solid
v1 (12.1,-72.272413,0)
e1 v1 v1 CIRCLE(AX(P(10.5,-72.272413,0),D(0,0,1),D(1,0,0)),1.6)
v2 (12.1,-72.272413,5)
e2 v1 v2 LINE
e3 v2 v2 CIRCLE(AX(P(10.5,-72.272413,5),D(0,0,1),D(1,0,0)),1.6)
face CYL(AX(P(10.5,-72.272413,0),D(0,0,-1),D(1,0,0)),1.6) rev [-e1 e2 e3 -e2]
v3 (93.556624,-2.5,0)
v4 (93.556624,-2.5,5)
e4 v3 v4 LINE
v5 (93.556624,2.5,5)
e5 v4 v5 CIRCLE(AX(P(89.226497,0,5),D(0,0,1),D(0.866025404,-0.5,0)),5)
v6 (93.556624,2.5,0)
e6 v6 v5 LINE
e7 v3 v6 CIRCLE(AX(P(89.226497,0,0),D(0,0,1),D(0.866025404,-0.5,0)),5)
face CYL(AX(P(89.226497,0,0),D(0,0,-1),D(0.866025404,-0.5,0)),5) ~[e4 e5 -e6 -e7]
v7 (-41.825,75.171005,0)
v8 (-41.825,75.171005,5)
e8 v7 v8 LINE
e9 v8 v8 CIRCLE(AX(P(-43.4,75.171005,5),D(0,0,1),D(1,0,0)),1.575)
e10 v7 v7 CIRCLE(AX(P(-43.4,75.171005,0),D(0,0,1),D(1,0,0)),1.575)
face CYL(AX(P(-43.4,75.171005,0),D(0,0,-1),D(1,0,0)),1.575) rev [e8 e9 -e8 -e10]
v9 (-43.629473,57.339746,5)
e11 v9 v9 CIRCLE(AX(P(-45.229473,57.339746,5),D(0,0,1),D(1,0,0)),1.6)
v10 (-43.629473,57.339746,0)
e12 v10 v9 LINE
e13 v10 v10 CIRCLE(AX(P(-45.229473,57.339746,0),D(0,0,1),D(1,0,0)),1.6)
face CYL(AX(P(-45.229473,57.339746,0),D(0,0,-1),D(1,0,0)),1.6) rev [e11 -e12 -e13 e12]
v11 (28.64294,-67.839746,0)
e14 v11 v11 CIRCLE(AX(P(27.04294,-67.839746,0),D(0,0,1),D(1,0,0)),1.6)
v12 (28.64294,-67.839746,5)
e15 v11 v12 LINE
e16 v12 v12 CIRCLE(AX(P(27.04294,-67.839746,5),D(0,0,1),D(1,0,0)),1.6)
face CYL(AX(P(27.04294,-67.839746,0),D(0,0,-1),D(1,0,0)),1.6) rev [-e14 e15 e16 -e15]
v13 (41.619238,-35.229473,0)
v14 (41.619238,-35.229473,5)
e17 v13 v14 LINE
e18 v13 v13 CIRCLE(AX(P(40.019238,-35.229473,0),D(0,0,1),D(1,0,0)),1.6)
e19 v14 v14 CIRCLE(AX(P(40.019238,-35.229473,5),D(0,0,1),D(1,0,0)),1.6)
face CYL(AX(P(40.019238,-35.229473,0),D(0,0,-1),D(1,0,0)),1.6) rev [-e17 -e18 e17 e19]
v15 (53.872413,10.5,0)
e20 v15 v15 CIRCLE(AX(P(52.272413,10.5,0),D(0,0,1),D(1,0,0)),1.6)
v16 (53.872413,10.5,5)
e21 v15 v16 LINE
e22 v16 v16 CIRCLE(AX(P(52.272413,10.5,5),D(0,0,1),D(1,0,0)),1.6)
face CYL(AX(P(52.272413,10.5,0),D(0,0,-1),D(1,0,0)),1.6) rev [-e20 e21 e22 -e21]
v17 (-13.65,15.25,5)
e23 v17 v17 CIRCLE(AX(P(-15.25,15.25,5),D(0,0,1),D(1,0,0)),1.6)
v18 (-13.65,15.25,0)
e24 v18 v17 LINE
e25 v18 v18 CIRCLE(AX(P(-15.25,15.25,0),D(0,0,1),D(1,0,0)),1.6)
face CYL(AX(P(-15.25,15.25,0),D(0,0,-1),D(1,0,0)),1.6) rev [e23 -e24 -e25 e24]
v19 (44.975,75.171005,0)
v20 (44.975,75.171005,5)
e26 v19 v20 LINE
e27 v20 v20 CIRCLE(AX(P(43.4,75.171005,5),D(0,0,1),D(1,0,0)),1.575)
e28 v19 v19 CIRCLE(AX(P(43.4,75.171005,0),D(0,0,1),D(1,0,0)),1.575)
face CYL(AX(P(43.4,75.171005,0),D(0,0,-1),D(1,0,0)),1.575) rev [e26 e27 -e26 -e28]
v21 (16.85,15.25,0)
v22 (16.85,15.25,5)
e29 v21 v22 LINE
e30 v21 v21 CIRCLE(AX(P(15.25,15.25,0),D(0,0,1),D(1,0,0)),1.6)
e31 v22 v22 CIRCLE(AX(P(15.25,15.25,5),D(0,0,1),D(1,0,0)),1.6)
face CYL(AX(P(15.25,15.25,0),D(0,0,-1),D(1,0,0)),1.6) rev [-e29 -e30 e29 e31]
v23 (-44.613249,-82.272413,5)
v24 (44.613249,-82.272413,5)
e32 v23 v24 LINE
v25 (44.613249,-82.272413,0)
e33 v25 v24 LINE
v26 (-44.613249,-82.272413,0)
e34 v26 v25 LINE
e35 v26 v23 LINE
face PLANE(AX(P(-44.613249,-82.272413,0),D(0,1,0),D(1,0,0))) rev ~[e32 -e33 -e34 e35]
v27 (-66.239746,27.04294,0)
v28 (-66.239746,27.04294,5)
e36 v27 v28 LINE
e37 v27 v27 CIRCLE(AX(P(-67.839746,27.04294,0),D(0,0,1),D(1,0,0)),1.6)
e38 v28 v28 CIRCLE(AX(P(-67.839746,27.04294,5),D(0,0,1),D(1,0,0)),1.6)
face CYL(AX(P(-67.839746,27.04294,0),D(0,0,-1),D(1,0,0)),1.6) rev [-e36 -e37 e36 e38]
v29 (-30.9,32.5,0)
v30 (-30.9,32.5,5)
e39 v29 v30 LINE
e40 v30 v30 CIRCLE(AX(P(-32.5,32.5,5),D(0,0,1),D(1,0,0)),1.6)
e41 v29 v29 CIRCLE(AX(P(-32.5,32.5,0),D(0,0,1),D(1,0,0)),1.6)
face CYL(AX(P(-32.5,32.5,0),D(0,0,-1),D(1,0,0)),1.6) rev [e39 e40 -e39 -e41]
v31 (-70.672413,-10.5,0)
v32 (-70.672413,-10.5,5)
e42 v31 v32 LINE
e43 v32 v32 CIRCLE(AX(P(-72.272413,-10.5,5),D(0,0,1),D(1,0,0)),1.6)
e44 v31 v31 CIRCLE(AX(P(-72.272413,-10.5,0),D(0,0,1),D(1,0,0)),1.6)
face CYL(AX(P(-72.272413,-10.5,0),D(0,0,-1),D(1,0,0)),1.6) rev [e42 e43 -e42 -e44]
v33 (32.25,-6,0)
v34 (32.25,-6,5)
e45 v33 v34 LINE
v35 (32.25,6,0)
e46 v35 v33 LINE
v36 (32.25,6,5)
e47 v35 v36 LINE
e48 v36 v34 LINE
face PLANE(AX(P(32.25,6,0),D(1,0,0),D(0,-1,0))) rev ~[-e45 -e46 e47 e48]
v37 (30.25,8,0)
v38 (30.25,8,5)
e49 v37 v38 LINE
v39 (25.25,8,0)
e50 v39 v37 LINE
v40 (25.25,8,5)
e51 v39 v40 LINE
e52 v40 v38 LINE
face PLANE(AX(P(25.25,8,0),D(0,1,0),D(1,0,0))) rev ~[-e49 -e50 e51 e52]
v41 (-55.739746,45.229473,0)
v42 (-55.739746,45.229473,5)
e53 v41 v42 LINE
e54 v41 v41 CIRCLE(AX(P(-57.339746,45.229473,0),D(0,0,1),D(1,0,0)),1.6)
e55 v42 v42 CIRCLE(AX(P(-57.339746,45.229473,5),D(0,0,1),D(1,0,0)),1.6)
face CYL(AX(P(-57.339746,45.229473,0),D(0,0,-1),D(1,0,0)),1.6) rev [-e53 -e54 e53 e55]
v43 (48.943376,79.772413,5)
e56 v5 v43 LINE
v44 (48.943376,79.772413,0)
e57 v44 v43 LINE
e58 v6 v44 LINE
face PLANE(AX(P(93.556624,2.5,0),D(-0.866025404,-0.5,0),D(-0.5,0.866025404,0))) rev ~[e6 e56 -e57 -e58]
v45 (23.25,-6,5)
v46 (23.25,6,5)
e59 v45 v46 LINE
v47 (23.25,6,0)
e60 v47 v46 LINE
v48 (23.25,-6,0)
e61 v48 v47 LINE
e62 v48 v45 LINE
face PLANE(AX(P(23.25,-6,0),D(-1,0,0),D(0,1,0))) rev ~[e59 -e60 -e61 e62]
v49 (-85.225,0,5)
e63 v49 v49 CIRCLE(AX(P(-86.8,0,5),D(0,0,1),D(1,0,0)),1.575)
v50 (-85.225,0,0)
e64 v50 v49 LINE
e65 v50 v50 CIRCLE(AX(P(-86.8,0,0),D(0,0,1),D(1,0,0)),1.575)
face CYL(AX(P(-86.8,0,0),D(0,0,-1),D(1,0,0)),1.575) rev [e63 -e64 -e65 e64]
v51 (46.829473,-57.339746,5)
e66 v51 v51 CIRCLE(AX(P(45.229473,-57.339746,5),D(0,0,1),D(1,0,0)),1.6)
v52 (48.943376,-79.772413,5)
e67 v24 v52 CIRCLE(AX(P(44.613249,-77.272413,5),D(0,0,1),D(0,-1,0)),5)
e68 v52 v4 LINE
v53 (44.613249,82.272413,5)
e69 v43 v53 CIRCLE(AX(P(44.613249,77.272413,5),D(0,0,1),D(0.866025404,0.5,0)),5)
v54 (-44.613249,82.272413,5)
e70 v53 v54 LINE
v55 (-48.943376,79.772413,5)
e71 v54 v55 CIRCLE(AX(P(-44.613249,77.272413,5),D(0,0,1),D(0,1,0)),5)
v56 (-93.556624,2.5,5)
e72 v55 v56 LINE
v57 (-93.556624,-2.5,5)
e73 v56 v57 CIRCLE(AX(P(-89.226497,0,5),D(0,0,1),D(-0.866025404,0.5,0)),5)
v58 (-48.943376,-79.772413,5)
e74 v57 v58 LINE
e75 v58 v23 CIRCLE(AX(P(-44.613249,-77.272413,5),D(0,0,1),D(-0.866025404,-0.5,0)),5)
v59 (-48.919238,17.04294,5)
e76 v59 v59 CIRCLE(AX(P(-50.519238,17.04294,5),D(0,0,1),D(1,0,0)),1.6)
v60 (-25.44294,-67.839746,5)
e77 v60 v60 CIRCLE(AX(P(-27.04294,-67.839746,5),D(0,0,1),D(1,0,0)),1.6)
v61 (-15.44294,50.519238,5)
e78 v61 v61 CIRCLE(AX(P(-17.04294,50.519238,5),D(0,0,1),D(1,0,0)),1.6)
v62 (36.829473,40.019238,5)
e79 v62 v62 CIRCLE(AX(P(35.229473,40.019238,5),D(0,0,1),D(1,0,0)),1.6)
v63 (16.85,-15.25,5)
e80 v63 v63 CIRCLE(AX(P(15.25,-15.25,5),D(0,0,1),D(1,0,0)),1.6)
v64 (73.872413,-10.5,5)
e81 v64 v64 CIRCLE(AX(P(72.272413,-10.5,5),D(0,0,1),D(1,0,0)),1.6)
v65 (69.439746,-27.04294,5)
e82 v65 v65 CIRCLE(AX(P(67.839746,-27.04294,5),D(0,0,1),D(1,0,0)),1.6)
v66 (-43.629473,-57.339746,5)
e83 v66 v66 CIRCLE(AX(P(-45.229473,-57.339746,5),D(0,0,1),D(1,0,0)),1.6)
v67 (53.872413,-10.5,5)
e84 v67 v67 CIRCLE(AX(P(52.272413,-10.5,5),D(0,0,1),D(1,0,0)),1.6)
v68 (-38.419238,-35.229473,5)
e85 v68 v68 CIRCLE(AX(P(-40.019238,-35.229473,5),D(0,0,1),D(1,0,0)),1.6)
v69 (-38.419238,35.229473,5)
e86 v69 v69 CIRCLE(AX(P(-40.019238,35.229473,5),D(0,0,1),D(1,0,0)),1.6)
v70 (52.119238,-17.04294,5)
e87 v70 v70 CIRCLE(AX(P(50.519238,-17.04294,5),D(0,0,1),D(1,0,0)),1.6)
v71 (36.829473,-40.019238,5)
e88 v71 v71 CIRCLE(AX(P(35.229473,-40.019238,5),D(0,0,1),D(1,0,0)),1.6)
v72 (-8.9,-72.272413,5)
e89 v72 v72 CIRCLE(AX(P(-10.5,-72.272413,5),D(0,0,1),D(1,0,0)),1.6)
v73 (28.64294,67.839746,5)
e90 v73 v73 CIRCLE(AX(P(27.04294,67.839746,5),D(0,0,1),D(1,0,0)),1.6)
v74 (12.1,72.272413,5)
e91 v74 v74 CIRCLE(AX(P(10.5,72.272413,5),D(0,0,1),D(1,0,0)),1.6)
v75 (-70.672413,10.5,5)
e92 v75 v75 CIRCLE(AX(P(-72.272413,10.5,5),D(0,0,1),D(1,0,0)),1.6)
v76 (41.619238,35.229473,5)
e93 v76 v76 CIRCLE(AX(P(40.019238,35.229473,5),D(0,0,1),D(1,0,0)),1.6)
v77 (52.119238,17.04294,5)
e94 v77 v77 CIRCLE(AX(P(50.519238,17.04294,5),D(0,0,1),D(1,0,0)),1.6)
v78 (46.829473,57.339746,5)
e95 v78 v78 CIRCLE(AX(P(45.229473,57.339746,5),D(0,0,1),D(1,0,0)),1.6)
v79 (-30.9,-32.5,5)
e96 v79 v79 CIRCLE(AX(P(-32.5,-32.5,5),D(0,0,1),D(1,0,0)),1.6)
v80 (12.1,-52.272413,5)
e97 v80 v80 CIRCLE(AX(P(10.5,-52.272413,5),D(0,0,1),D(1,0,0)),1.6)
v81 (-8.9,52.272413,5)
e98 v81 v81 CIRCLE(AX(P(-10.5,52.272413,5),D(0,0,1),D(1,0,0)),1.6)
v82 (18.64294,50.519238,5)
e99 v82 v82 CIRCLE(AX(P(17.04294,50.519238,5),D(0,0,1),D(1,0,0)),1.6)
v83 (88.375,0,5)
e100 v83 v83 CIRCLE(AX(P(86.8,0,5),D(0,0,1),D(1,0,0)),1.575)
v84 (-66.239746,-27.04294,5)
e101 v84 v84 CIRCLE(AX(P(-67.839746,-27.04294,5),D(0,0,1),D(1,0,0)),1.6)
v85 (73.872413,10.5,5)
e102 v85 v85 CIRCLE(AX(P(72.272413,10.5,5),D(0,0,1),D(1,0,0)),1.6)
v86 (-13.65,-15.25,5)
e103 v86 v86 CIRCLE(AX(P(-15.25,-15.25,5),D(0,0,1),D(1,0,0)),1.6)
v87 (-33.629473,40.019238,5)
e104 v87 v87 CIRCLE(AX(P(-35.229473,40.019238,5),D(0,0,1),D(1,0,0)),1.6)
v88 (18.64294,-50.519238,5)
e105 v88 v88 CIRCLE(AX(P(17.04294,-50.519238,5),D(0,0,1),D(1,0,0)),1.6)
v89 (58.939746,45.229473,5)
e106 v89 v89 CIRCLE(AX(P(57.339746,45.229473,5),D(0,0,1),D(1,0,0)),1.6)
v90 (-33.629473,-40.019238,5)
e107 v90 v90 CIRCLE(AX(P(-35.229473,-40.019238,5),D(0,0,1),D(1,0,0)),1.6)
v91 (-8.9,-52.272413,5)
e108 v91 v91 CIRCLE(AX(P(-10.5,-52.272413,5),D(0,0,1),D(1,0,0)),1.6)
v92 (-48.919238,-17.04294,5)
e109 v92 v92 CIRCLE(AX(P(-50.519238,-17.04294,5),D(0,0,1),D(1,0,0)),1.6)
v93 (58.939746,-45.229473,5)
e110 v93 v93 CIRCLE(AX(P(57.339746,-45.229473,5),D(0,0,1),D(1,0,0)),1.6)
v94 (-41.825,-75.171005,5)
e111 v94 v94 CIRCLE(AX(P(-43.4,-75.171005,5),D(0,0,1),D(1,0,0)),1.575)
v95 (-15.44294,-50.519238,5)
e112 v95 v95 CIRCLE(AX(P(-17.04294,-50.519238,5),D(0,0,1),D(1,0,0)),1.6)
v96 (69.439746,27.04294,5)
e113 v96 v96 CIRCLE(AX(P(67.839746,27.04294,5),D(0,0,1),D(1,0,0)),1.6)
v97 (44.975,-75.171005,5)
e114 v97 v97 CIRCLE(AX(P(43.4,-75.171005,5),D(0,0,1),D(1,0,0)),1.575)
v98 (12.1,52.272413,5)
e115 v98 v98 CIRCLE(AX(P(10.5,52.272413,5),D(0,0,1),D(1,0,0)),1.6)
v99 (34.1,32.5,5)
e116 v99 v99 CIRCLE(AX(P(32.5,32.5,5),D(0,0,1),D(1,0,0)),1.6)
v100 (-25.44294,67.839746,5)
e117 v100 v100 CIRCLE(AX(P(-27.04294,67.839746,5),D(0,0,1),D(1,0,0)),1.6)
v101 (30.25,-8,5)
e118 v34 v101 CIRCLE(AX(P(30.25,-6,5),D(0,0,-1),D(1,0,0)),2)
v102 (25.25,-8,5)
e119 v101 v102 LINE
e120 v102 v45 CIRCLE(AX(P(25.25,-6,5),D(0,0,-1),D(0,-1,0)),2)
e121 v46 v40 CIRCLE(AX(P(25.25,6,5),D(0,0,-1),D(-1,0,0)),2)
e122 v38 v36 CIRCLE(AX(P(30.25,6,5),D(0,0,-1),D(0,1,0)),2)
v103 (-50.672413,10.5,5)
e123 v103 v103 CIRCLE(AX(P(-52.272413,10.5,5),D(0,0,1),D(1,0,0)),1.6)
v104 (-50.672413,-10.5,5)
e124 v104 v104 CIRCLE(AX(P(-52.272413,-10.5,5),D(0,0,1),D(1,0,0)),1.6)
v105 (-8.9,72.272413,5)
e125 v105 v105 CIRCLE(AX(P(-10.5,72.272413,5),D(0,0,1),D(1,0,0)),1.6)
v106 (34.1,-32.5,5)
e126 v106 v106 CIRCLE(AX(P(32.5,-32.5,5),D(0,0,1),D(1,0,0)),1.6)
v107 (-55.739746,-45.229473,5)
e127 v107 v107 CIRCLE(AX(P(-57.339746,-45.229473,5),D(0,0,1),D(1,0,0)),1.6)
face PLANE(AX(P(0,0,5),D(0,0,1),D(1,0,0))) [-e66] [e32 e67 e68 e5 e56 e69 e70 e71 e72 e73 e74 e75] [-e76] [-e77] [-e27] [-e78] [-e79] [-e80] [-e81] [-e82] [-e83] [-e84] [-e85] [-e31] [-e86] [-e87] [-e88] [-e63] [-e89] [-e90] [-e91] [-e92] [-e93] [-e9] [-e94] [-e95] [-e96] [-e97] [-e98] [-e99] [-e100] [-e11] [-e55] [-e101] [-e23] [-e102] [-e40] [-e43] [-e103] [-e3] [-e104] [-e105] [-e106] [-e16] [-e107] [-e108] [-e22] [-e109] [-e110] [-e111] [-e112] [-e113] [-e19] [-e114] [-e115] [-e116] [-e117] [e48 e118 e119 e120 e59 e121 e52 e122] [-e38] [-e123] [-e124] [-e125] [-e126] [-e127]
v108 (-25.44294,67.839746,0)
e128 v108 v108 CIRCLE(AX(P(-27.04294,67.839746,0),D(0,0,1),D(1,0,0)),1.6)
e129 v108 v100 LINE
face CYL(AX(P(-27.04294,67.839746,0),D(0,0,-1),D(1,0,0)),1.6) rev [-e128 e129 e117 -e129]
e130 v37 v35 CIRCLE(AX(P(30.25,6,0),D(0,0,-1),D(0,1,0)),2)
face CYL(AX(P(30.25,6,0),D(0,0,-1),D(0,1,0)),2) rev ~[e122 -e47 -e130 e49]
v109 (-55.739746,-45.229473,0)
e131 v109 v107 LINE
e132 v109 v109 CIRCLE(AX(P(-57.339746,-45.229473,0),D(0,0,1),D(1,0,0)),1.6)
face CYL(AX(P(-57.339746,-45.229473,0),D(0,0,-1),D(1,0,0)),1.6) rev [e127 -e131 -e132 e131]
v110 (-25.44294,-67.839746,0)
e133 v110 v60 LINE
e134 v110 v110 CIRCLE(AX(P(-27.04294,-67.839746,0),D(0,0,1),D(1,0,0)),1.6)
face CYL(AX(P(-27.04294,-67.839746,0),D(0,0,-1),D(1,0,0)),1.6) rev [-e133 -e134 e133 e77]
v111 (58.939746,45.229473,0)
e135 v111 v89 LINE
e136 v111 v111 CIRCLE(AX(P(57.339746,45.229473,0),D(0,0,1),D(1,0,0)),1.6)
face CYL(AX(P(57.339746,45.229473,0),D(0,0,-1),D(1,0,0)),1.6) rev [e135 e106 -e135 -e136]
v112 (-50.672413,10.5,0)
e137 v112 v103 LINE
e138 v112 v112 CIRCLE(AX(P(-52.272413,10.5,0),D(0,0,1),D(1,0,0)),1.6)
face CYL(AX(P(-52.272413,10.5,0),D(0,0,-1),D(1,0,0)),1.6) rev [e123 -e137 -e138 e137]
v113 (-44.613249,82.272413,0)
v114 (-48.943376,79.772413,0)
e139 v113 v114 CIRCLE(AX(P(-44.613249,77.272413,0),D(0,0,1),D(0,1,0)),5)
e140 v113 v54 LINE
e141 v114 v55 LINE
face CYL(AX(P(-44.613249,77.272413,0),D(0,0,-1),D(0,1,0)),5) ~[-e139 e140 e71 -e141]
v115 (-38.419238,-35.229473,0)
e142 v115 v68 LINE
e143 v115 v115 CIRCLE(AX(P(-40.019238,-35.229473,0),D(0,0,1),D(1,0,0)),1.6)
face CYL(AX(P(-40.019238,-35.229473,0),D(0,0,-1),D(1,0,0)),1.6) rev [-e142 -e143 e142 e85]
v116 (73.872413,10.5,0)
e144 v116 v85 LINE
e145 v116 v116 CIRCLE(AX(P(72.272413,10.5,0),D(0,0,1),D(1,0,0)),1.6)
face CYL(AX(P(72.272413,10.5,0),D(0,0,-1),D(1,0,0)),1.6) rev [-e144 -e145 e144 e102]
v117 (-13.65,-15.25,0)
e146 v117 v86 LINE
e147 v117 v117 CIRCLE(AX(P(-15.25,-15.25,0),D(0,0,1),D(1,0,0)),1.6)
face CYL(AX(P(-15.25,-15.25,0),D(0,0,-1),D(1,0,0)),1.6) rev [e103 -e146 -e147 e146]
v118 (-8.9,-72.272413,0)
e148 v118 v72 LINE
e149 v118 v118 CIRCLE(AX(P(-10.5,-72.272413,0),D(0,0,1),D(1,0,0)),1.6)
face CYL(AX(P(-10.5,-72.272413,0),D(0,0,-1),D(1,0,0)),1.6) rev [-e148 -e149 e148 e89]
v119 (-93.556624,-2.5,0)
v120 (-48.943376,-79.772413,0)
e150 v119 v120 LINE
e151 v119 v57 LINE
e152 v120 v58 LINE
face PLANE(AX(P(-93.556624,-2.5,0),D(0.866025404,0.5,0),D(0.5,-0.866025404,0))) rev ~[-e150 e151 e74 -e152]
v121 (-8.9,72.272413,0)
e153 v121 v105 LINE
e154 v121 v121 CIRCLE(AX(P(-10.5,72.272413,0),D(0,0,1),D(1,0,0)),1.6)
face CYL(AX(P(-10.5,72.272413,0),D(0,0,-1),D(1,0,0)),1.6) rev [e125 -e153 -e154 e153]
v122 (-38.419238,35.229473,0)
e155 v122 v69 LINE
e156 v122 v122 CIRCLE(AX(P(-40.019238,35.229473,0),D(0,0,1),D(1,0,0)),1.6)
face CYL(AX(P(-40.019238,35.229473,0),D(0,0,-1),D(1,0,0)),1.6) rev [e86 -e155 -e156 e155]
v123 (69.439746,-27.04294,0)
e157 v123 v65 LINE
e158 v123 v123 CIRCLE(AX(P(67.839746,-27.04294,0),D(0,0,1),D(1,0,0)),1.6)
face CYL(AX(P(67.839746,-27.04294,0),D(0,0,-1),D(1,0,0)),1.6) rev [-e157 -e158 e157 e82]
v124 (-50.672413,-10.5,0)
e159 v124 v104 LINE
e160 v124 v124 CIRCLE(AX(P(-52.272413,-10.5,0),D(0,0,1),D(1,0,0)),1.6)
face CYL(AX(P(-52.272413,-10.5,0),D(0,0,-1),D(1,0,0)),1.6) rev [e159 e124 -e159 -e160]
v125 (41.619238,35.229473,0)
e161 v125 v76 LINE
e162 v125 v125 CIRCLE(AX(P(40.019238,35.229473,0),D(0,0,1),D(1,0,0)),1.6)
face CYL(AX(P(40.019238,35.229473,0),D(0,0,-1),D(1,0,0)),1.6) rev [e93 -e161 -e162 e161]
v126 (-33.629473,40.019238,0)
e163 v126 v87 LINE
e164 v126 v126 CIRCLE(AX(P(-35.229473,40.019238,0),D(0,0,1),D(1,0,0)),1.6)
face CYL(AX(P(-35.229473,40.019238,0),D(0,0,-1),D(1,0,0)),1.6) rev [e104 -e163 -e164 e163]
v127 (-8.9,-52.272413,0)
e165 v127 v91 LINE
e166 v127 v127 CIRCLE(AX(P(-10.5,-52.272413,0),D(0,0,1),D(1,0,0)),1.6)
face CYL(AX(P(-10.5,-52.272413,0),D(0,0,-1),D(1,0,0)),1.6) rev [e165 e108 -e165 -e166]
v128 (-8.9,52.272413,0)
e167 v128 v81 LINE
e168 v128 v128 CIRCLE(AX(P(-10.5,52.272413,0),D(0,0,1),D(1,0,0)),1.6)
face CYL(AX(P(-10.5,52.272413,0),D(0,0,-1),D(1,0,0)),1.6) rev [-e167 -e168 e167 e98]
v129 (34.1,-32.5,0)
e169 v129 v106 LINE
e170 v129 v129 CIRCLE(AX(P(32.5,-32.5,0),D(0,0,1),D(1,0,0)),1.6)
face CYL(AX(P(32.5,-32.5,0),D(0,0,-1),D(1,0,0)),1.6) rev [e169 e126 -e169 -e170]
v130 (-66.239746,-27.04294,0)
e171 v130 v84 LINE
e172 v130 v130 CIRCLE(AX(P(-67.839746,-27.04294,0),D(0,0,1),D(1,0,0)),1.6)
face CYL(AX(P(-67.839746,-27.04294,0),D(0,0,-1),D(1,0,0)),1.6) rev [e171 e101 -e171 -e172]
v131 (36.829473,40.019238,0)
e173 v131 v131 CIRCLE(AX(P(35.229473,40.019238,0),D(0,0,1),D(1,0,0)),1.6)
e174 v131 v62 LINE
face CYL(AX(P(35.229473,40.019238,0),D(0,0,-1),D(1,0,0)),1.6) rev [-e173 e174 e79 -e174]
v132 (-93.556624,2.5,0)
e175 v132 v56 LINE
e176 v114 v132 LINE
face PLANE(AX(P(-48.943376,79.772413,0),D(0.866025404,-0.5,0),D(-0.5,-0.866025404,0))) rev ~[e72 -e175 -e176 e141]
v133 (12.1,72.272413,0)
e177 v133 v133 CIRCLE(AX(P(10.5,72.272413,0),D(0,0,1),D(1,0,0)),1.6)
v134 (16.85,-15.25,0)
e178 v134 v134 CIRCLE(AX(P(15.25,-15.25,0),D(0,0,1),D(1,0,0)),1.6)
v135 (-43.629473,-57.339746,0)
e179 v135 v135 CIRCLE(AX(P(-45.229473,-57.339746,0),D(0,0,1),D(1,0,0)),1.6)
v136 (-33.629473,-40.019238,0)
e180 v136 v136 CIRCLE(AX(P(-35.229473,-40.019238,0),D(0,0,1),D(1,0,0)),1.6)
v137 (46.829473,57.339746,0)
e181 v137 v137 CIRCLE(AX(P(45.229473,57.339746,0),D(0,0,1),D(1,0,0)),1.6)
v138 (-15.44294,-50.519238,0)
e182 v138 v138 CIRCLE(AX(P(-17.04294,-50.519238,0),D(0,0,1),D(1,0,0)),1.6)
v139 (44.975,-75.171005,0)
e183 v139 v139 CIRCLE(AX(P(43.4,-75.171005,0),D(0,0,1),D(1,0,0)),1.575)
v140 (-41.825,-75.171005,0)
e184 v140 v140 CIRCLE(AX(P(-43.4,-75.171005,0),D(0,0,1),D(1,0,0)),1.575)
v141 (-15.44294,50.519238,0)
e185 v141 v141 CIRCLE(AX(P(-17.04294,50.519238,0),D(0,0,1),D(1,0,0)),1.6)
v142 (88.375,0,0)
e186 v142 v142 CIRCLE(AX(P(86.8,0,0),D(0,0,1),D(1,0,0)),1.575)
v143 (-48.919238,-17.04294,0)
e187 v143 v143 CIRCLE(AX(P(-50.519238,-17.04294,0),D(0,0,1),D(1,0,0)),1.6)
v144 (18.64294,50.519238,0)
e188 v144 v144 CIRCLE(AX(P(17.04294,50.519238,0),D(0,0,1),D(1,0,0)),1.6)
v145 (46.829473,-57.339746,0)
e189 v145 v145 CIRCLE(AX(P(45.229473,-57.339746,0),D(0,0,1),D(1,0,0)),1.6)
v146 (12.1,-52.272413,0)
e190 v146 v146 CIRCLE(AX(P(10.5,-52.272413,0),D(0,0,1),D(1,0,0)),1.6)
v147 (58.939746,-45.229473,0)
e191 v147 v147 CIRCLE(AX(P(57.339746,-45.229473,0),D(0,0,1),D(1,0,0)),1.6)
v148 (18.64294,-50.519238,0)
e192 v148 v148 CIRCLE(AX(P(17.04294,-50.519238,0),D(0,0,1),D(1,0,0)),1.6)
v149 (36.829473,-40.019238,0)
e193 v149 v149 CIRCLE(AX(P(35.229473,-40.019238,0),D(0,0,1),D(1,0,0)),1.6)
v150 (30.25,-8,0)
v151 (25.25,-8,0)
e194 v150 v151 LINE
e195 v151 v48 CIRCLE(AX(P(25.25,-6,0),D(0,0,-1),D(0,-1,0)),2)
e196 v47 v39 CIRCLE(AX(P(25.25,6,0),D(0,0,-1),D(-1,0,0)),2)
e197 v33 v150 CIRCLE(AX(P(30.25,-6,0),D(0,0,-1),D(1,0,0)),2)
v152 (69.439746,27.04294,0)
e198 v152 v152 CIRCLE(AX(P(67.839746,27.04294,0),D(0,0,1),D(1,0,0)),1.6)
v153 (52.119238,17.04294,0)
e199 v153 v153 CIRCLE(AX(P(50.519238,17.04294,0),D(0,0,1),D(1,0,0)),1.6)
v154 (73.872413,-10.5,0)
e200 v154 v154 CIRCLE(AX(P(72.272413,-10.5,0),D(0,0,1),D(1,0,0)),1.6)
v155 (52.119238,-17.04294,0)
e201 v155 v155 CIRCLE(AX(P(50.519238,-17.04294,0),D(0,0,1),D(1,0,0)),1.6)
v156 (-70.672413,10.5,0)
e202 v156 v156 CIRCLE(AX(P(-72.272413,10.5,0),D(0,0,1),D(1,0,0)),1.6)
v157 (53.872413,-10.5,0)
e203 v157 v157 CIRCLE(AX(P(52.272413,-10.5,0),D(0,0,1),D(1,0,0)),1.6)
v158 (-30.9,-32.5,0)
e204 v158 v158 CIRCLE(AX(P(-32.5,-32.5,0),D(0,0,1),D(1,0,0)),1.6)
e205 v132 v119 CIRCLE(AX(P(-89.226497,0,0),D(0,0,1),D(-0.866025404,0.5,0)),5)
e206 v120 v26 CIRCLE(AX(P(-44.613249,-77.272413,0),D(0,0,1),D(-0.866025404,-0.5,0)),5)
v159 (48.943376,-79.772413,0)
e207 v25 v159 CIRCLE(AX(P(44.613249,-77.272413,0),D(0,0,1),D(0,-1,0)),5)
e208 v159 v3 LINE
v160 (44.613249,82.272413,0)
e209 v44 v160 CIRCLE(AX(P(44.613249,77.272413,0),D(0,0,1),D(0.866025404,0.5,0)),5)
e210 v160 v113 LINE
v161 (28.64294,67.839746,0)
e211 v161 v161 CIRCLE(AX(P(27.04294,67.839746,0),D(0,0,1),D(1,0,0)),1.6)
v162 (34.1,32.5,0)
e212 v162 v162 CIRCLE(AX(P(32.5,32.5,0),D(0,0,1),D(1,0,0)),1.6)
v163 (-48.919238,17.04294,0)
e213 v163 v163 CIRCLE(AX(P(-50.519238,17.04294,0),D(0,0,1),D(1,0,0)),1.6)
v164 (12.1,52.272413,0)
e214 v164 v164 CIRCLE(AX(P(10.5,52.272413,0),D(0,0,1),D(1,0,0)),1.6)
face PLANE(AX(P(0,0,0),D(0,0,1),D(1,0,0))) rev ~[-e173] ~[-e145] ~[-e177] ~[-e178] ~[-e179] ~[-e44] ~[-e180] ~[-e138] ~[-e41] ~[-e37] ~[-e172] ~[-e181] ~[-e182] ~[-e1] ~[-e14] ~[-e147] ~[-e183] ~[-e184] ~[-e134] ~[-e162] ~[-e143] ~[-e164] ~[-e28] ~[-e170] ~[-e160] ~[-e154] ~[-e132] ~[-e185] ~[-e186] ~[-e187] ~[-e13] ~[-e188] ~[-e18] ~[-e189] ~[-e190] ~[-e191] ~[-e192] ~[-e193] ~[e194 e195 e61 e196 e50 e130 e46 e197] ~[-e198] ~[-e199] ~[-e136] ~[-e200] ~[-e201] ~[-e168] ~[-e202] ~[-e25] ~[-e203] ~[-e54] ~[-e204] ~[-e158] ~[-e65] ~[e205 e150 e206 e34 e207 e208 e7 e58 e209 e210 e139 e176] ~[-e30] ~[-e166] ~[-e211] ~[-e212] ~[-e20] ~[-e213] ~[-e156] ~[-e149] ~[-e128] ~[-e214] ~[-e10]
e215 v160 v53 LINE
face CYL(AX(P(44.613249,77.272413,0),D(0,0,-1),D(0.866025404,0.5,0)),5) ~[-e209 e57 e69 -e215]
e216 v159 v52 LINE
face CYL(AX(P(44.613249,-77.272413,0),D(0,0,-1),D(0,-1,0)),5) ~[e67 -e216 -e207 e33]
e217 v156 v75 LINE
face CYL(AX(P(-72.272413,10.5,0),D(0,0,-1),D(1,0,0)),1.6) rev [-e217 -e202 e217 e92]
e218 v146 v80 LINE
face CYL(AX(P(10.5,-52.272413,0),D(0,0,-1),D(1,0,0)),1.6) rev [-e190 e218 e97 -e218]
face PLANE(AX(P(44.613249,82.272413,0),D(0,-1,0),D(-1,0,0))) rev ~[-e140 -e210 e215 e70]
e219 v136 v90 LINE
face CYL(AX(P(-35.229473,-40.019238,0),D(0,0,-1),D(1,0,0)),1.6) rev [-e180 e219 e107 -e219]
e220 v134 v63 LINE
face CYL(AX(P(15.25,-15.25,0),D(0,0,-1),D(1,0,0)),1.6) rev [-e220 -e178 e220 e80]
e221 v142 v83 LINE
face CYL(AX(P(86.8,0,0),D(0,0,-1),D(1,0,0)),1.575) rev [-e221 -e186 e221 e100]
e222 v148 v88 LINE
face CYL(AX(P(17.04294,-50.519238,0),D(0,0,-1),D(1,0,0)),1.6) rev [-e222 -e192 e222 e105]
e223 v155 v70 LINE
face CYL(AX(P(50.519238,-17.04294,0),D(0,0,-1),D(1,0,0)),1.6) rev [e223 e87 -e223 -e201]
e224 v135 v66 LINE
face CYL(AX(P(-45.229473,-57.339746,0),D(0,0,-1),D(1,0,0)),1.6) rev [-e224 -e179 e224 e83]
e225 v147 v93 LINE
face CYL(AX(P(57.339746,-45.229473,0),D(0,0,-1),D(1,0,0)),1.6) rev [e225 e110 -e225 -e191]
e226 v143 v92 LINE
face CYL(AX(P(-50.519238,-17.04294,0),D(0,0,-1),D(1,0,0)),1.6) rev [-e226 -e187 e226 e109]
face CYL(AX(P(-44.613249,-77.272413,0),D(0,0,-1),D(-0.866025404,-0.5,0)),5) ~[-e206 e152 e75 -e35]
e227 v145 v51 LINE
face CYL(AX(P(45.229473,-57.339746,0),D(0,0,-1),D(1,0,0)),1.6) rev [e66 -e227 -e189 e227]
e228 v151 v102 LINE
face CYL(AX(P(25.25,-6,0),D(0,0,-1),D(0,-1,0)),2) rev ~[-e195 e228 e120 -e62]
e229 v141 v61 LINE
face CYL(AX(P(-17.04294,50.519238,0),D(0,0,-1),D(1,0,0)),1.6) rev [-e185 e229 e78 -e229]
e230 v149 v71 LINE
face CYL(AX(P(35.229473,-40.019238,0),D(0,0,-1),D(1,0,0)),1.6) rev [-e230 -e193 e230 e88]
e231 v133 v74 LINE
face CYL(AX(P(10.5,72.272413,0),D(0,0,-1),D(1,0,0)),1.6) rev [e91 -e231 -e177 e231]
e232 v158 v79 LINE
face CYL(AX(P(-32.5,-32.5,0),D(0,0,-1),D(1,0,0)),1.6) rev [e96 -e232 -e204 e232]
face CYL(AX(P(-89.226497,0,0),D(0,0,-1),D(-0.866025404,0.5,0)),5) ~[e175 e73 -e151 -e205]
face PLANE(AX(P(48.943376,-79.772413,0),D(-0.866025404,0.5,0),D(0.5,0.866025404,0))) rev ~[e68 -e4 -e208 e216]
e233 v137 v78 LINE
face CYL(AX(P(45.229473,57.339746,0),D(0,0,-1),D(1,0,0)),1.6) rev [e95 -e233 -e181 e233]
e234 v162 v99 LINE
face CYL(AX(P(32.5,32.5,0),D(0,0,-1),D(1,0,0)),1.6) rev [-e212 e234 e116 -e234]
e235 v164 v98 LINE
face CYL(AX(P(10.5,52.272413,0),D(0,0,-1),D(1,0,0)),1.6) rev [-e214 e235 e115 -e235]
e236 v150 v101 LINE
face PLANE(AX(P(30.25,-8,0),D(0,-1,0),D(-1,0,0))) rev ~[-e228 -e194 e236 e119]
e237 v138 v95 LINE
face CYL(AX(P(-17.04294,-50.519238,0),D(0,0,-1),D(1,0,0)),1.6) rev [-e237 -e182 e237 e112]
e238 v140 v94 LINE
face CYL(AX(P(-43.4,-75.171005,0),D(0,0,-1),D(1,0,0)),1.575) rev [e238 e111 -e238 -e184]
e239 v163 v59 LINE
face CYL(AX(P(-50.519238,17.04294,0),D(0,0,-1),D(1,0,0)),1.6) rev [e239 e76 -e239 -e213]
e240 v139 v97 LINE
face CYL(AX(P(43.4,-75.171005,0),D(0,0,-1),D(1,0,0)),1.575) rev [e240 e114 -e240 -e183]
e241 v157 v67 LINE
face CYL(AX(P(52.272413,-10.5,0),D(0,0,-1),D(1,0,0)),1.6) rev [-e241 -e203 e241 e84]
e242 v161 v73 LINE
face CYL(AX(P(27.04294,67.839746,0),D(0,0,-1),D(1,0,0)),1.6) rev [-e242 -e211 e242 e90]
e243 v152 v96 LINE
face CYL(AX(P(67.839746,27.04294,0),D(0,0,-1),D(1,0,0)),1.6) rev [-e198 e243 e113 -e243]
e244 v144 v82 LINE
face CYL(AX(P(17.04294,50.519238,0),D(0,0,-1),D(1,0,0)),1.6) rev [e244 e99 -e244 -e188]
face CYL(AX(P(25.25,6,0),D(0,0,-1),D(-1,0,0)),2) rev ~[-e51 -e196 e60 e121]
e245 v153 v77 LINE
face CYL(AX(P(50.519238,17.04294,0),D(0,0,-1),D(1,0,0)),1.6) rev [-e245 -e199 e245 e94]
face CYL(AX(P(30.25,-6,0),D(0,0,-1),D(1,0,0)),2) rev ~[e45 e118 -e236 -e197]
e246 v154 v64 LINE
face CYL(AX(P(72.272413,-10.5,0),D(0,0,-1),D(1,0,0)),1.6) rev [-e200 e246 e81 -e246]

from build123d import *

# Parameters (mm, degrees)
F0_R     = 1.6
F0_R_2   = 1.575
F0_R_3   = 1.15
F0_R_4   = 5
F1_DEPTH = 5


with BuildPart() as f1:
    # F0 (on Top) → F1 (new body)
    with BuildSketch(Plane.XY):
        with BuildLine():
            Line((-93.5566243293, -2.4999999943), (-48.9433756768, -79.7724133547))
            ThreePointArc((-48.9433756768, -79.7724133547), (-47.1132486579, -81.6025403736), (-44.6132486579, -82.2724133548))
            Line((-44.6132486579, -82.2724133548), (44.6132486502, -82.2724133566))
            ThreePointArc((44.6132486502, -82.2724133566), (47.1132486502, -81.6025403755), (48.9433756692, -79.7724133566))
            Line((48.9433756692, -79.7724133566), (93.5566243248, -2.499999998))
            ThreePointArc((93.5566243248, -2.499999998), (94.2264973059, 2e-09), (93.5566243249, 2.500000002))
            Line((93.5566243249, 2.500000002), (48.9433756724, 79.7724133624))
            ThreePointArc((48.9433756724, 79.7724133624), (47.1132486535, 81.6025403814), (44.6132486535, 82.2724133625))
            Line((44.6132486535, 82.2724133625), (-44.6132486546, 82.2724133643))
            ThreePointArc((-44.6132486546, 82.2724133643), (-47.1132486546, 81.6025403832), (-48.9433756736, 79.7724133644))
            Line((-48.9433756736, 79.7724133644), (-93.5566243292, 2.5000000057))
            ThreePointArc((-93.5566243292, 2.5000000057), (-94.2264973103, 5.7e-09), (-93.5566243293, -2.4999999943))
        make_face()
        with Locations((-57.3397459654, -45.229473422)):
            Circle(F0_R, mode=Mode.SUBTRACT)
        with Locations((-43.4000000039, -75.1710050514)):
            Circle(F0_R_2, mode=Mode.SUBTRACT)
        with Locations((-27.0429399416, -67.839745966)):
            Circle(F0_R, mode=Mode.SUBTRACT)
        with Locations((-10.4999999994, -72.2724133636)):
            Circle(F0_R, mode=Mode.SUBTRACT)
        with Locations((-45.229473421, -57.339745966)):
            Circle(F0_R, mode=Mode.SUBTRACT)
        with Locations((-10.4999999994, -52.2724133636)):
            Circle(F0_R, mode=Mode.SUBTRACT)
        with Locations((-17.0429399416, -50.5192378903)):
            Circle(F0_R, mode=Mode.SUBTRACT)
        with Locations((-67.8397459654, -27.0429399426)):
            Circle(F0_R, mode=Mode.SUBTRACT)
        with Locations((-72.2724133636, -10.5000000006)):
            Circle(F0_R, mode=Mode.SUBTRACT)
        with Locations((-86.8000000044, 1.9e-09)):
            Circle(F0_R_2, mode=Mode.SUBTRACT)
        with Locations((-50.5192378897, -17.0429399426)):
            Circle(F0_R, mode=Mode.SUBTRACT)
        with Locations((-52.2724133636, -10.5000000006)):
            Circle(F0_R, mode=Mode.SUBTRACT)
        with Locations((-40.0192378897, -35.229473422)):
            Circle(F0_R, mode=Mode.SUBTRACT)
        with Locations((-35.229473421, -40.0192378903)):
            Circle(F0_R, mode=Mode.SUBTRACT)
        with Locations((-32.5, -32.5)):
            Circle(F0_R, mode=Mode.SUBTRACT)
        with Locations((-6.5, -27)):
            Circle(F0_R_3, mode=Mode.SUBTRACT)
        with Locations((-15.25, -15.25)):
            Circle(F0_R, mode=Mode.SUBTRACT)
        with Locations((10.5000000006, -72.2724133636)):
            Circle(F0_R, mode=Mode.SUBTRACT)
        with Locations((43.4000000006, -75.1710050533)):
            Circle(F0_R_2, mode=Mode.SUBTRACT)
        with Locations((27.0429399426, -67.8397459654)):
            Circle(F0_R, mode=Mode.SUBTRACT)
        with Locations((10.5000000006, -52.2724133636)):
            Circle(F0_R, mode=Mode.SUBTRACT)
        with Locations((17.0429399426, -50.5192378897)):
            Circle(F0_R, mode=Mode.SUBTRACT)
        with Locations((45.229473422, -57.3397459654)):
            Circle(F0_R, mode=Mode.SUBTRACT)
        with Locations((57.339745966, -45.229473421)):
            Circle(F0_R, mode=Mode.SUBTRACT)
        with Locations((6.5, -27)):
            Circle(F0_R_3, mode=Mode.SUBTRACT)
        with Locations((35.229473422, -40.0192378897)):
            Circle(F0_R, mode=Mode.SUBTRACT)
        with Locations((32.5, -32.5)):
            Circle(F0_R, mode=Mode.SUBTRACT)
        with Locations((40.0192378903, -35.229473421)):
            Circle(F0_R, mode=Mode.SUBTRACT)
        with Locations((15.25, -15.25)):
            Circle(F0_R, mode=Mode.SUBTRACT)
        Circle(F0_R_4, mode=Mode.SUBTRACT)
        with BuildLine():
            ThreePointArc((23.25, 6), (23.8357864376, 7.4142135624), (25.25, 8))
            Line((25.25, 8), (30.25, 8))
            ThreePointArc((30.25, 8), (31.6642135624, 7.4142135624), (32.25, 6))
            Line((32.25, 6), (32.25, -6))
            ThreePointArc((32.25, -6), (31.6642135624, -7.4142135624), (30.25, -8))
            Line((30.25, -8), (25.25, -8))
            ThreePointArc((25.25, -8), (23.8357864376, -7.4142135624), (23.25, -6))
            Line((23.25, -6), (23.25, 6))
        make_face(mode=Mode.SUBTRACT)
        with Locations((67.839745966, -27.0429399416)):
            Circle(F0_R, mode=Mode.SUBTRACT)
        with Locations((50.5192378903, -17.0429399416)):
            Circle(F0_R, mode=Mode.SUBTRACT)
        with Locations((52.2724133636, -10.4999999994)):
            Circle(F0_R, mode=Mode.SUBTRACT)
        with Locations((72.2724133636, -10.4999999994)):
            Circle(F0_R, mode=Mode.SUBTRACT)
        with Locations((86.8000000044, -1.9e-09)):
            Circle(F0_R_2, mode=Mode.SUBTRACT)
        with Locations((-72.2724133636, 10.4999999994)):
            Circle(F0_R, mode=Mode.SUBTRACT)
        with Locations((-52.2724133636, 10.4999999994)):
            Circle(F0_R, mode=Mode.SUBTRACT)
        with Locations((-50.5192378903, 17.0429399416)):
            Circle(F0_R, mode=Mode.SUBTRACT)
        with Locations((-67.839745966, 27.0429399416)):
            Circle(F0_R, mode=Mode.SUBTRACT)
        with Locations((-15.25, 15.25)):
            Circle(F0_R, mode=Mode.SUBTRACT)
        with Locations((-40.0192378903, 35.229473421)):
            Circle(F0_R, mode=Mode.SUBTRACT)
        with Locations((-32.5, 32.5)):
            Circle(F0_R, mode=Mode.SUBTRACT)
        with Locations((-35.229473422, 40.0192378897)):
            Circle(F0_R, mode=Mode.SUBTRACT)
        with Locations((-6.5, 27)):
            Circle(F0_R_3, mode=Mode.SUBTRACT)
        with Locations((-57.339745966, 45.229473421)):
            Circle(F0_R, mode=Mode.SUBTRACT)
        with Locations((-45.229473422, 57.3397459654)):
            Circle(F0_R, mode=Mode.SUBTRACT)
        with Locations((-17.0429399426, 50.5192378897)):
            Circle(F0_R, mode=Mode.SUBTRACT)
        with Locations((-10.5000000006, 52.2724133636)):
            Circle(F0_R, mode=Mode.SUBTRACT)
        with Locations((-27.0429399426, 67.8397459654)):
            Circle(F0_R, mode=Mode.SUBTRACT)
        with Locations((-43.4000000006, 75.1710050533)):
            Circle(F0_R_2, mode=Mode.SUBTRACT)
        with Locations((-10.5000000006, 72.2724133636)):
            Circle(F0_R, mode=Mode.SUBTRACT)
        with Locations((15.25, 15.25)):
            Circle(F0_R, mode=Mode.SUBTRACT)
        with Locations((6.5, 27)):
            Circle(F0_R_3, mode=Mode.SUBTRACT)
        with Locations((32.5, 32.5)):
            Circle(F0_R, mode=Mode.SUBTRACT)
        with Locations((35.229473421, 40.0192378903)):
            Circle(F0_R, mode=Mode.SUBTRACT)
        with Locations((40.0192378897, 35.229473422)):
            Circle(F0_R, mode=Mode.SUBTRACT)
        with Locations((52.2724133636, 10.5000000006)):
            Circle(F0_R, mode=Mode.SUBTRACT)
        with Locations((50.5192378897, 17.0429399426)):
            Circle(F0_R, mode=Mode.SUBTRACT)
        with Locations((72.2724133636, 10.5000000006)):
            Circle(F0_R, mode=Mode.SUBTRACT)
        with Locations((67.8397459654, 27.0429399426)):
            Circle(F0_R, mode=Mode.SUBTRACT)
        with Locations((17.0429399416, 50.5192378903)):
            Circle(F0_R, mode=Mode.SUBTRACT)
        with Locations((10.4999999994, 52.2724133636)):
            Circle(F0_R, mode=Mode.SUBTRACT)
        with Locations((45.229473421, 57.339745966)):
            Circle(F0_R, mode=Mode.SUBTRACT)
        with Locations((10.4999999994, 72.2724133636)):
            Circle(F0_R, mode=Mode.SUBTRACT)
        with Locations((27.0429399416, 67.839745966)):
            Circle(F0_R, mode=Mode.SUBTRACT)
        with Locations((43.4000000039, 75.1710050514)):
            Circle(F0_R_2, mode=Mode.SUBTRACT)
        with Locations((57.3397459654, 45.229473422)):
            Circle(F0_R, mode=Mode.SUBTRACT)
        with Locations((-6.5, -27)):
            Circle(F0_R_3)
        with Locations((6.5, -27)):
            Circle(F0_R_3)
        with Locations((6.5, 27)):
            Circle(F0_R_3)
        with Locations((-6.5, 27)):
            Circle(F0_R_3)
        Circle(F0_R_4)
    extrude(amount=F1_DEPTH)


solid = f1.part
